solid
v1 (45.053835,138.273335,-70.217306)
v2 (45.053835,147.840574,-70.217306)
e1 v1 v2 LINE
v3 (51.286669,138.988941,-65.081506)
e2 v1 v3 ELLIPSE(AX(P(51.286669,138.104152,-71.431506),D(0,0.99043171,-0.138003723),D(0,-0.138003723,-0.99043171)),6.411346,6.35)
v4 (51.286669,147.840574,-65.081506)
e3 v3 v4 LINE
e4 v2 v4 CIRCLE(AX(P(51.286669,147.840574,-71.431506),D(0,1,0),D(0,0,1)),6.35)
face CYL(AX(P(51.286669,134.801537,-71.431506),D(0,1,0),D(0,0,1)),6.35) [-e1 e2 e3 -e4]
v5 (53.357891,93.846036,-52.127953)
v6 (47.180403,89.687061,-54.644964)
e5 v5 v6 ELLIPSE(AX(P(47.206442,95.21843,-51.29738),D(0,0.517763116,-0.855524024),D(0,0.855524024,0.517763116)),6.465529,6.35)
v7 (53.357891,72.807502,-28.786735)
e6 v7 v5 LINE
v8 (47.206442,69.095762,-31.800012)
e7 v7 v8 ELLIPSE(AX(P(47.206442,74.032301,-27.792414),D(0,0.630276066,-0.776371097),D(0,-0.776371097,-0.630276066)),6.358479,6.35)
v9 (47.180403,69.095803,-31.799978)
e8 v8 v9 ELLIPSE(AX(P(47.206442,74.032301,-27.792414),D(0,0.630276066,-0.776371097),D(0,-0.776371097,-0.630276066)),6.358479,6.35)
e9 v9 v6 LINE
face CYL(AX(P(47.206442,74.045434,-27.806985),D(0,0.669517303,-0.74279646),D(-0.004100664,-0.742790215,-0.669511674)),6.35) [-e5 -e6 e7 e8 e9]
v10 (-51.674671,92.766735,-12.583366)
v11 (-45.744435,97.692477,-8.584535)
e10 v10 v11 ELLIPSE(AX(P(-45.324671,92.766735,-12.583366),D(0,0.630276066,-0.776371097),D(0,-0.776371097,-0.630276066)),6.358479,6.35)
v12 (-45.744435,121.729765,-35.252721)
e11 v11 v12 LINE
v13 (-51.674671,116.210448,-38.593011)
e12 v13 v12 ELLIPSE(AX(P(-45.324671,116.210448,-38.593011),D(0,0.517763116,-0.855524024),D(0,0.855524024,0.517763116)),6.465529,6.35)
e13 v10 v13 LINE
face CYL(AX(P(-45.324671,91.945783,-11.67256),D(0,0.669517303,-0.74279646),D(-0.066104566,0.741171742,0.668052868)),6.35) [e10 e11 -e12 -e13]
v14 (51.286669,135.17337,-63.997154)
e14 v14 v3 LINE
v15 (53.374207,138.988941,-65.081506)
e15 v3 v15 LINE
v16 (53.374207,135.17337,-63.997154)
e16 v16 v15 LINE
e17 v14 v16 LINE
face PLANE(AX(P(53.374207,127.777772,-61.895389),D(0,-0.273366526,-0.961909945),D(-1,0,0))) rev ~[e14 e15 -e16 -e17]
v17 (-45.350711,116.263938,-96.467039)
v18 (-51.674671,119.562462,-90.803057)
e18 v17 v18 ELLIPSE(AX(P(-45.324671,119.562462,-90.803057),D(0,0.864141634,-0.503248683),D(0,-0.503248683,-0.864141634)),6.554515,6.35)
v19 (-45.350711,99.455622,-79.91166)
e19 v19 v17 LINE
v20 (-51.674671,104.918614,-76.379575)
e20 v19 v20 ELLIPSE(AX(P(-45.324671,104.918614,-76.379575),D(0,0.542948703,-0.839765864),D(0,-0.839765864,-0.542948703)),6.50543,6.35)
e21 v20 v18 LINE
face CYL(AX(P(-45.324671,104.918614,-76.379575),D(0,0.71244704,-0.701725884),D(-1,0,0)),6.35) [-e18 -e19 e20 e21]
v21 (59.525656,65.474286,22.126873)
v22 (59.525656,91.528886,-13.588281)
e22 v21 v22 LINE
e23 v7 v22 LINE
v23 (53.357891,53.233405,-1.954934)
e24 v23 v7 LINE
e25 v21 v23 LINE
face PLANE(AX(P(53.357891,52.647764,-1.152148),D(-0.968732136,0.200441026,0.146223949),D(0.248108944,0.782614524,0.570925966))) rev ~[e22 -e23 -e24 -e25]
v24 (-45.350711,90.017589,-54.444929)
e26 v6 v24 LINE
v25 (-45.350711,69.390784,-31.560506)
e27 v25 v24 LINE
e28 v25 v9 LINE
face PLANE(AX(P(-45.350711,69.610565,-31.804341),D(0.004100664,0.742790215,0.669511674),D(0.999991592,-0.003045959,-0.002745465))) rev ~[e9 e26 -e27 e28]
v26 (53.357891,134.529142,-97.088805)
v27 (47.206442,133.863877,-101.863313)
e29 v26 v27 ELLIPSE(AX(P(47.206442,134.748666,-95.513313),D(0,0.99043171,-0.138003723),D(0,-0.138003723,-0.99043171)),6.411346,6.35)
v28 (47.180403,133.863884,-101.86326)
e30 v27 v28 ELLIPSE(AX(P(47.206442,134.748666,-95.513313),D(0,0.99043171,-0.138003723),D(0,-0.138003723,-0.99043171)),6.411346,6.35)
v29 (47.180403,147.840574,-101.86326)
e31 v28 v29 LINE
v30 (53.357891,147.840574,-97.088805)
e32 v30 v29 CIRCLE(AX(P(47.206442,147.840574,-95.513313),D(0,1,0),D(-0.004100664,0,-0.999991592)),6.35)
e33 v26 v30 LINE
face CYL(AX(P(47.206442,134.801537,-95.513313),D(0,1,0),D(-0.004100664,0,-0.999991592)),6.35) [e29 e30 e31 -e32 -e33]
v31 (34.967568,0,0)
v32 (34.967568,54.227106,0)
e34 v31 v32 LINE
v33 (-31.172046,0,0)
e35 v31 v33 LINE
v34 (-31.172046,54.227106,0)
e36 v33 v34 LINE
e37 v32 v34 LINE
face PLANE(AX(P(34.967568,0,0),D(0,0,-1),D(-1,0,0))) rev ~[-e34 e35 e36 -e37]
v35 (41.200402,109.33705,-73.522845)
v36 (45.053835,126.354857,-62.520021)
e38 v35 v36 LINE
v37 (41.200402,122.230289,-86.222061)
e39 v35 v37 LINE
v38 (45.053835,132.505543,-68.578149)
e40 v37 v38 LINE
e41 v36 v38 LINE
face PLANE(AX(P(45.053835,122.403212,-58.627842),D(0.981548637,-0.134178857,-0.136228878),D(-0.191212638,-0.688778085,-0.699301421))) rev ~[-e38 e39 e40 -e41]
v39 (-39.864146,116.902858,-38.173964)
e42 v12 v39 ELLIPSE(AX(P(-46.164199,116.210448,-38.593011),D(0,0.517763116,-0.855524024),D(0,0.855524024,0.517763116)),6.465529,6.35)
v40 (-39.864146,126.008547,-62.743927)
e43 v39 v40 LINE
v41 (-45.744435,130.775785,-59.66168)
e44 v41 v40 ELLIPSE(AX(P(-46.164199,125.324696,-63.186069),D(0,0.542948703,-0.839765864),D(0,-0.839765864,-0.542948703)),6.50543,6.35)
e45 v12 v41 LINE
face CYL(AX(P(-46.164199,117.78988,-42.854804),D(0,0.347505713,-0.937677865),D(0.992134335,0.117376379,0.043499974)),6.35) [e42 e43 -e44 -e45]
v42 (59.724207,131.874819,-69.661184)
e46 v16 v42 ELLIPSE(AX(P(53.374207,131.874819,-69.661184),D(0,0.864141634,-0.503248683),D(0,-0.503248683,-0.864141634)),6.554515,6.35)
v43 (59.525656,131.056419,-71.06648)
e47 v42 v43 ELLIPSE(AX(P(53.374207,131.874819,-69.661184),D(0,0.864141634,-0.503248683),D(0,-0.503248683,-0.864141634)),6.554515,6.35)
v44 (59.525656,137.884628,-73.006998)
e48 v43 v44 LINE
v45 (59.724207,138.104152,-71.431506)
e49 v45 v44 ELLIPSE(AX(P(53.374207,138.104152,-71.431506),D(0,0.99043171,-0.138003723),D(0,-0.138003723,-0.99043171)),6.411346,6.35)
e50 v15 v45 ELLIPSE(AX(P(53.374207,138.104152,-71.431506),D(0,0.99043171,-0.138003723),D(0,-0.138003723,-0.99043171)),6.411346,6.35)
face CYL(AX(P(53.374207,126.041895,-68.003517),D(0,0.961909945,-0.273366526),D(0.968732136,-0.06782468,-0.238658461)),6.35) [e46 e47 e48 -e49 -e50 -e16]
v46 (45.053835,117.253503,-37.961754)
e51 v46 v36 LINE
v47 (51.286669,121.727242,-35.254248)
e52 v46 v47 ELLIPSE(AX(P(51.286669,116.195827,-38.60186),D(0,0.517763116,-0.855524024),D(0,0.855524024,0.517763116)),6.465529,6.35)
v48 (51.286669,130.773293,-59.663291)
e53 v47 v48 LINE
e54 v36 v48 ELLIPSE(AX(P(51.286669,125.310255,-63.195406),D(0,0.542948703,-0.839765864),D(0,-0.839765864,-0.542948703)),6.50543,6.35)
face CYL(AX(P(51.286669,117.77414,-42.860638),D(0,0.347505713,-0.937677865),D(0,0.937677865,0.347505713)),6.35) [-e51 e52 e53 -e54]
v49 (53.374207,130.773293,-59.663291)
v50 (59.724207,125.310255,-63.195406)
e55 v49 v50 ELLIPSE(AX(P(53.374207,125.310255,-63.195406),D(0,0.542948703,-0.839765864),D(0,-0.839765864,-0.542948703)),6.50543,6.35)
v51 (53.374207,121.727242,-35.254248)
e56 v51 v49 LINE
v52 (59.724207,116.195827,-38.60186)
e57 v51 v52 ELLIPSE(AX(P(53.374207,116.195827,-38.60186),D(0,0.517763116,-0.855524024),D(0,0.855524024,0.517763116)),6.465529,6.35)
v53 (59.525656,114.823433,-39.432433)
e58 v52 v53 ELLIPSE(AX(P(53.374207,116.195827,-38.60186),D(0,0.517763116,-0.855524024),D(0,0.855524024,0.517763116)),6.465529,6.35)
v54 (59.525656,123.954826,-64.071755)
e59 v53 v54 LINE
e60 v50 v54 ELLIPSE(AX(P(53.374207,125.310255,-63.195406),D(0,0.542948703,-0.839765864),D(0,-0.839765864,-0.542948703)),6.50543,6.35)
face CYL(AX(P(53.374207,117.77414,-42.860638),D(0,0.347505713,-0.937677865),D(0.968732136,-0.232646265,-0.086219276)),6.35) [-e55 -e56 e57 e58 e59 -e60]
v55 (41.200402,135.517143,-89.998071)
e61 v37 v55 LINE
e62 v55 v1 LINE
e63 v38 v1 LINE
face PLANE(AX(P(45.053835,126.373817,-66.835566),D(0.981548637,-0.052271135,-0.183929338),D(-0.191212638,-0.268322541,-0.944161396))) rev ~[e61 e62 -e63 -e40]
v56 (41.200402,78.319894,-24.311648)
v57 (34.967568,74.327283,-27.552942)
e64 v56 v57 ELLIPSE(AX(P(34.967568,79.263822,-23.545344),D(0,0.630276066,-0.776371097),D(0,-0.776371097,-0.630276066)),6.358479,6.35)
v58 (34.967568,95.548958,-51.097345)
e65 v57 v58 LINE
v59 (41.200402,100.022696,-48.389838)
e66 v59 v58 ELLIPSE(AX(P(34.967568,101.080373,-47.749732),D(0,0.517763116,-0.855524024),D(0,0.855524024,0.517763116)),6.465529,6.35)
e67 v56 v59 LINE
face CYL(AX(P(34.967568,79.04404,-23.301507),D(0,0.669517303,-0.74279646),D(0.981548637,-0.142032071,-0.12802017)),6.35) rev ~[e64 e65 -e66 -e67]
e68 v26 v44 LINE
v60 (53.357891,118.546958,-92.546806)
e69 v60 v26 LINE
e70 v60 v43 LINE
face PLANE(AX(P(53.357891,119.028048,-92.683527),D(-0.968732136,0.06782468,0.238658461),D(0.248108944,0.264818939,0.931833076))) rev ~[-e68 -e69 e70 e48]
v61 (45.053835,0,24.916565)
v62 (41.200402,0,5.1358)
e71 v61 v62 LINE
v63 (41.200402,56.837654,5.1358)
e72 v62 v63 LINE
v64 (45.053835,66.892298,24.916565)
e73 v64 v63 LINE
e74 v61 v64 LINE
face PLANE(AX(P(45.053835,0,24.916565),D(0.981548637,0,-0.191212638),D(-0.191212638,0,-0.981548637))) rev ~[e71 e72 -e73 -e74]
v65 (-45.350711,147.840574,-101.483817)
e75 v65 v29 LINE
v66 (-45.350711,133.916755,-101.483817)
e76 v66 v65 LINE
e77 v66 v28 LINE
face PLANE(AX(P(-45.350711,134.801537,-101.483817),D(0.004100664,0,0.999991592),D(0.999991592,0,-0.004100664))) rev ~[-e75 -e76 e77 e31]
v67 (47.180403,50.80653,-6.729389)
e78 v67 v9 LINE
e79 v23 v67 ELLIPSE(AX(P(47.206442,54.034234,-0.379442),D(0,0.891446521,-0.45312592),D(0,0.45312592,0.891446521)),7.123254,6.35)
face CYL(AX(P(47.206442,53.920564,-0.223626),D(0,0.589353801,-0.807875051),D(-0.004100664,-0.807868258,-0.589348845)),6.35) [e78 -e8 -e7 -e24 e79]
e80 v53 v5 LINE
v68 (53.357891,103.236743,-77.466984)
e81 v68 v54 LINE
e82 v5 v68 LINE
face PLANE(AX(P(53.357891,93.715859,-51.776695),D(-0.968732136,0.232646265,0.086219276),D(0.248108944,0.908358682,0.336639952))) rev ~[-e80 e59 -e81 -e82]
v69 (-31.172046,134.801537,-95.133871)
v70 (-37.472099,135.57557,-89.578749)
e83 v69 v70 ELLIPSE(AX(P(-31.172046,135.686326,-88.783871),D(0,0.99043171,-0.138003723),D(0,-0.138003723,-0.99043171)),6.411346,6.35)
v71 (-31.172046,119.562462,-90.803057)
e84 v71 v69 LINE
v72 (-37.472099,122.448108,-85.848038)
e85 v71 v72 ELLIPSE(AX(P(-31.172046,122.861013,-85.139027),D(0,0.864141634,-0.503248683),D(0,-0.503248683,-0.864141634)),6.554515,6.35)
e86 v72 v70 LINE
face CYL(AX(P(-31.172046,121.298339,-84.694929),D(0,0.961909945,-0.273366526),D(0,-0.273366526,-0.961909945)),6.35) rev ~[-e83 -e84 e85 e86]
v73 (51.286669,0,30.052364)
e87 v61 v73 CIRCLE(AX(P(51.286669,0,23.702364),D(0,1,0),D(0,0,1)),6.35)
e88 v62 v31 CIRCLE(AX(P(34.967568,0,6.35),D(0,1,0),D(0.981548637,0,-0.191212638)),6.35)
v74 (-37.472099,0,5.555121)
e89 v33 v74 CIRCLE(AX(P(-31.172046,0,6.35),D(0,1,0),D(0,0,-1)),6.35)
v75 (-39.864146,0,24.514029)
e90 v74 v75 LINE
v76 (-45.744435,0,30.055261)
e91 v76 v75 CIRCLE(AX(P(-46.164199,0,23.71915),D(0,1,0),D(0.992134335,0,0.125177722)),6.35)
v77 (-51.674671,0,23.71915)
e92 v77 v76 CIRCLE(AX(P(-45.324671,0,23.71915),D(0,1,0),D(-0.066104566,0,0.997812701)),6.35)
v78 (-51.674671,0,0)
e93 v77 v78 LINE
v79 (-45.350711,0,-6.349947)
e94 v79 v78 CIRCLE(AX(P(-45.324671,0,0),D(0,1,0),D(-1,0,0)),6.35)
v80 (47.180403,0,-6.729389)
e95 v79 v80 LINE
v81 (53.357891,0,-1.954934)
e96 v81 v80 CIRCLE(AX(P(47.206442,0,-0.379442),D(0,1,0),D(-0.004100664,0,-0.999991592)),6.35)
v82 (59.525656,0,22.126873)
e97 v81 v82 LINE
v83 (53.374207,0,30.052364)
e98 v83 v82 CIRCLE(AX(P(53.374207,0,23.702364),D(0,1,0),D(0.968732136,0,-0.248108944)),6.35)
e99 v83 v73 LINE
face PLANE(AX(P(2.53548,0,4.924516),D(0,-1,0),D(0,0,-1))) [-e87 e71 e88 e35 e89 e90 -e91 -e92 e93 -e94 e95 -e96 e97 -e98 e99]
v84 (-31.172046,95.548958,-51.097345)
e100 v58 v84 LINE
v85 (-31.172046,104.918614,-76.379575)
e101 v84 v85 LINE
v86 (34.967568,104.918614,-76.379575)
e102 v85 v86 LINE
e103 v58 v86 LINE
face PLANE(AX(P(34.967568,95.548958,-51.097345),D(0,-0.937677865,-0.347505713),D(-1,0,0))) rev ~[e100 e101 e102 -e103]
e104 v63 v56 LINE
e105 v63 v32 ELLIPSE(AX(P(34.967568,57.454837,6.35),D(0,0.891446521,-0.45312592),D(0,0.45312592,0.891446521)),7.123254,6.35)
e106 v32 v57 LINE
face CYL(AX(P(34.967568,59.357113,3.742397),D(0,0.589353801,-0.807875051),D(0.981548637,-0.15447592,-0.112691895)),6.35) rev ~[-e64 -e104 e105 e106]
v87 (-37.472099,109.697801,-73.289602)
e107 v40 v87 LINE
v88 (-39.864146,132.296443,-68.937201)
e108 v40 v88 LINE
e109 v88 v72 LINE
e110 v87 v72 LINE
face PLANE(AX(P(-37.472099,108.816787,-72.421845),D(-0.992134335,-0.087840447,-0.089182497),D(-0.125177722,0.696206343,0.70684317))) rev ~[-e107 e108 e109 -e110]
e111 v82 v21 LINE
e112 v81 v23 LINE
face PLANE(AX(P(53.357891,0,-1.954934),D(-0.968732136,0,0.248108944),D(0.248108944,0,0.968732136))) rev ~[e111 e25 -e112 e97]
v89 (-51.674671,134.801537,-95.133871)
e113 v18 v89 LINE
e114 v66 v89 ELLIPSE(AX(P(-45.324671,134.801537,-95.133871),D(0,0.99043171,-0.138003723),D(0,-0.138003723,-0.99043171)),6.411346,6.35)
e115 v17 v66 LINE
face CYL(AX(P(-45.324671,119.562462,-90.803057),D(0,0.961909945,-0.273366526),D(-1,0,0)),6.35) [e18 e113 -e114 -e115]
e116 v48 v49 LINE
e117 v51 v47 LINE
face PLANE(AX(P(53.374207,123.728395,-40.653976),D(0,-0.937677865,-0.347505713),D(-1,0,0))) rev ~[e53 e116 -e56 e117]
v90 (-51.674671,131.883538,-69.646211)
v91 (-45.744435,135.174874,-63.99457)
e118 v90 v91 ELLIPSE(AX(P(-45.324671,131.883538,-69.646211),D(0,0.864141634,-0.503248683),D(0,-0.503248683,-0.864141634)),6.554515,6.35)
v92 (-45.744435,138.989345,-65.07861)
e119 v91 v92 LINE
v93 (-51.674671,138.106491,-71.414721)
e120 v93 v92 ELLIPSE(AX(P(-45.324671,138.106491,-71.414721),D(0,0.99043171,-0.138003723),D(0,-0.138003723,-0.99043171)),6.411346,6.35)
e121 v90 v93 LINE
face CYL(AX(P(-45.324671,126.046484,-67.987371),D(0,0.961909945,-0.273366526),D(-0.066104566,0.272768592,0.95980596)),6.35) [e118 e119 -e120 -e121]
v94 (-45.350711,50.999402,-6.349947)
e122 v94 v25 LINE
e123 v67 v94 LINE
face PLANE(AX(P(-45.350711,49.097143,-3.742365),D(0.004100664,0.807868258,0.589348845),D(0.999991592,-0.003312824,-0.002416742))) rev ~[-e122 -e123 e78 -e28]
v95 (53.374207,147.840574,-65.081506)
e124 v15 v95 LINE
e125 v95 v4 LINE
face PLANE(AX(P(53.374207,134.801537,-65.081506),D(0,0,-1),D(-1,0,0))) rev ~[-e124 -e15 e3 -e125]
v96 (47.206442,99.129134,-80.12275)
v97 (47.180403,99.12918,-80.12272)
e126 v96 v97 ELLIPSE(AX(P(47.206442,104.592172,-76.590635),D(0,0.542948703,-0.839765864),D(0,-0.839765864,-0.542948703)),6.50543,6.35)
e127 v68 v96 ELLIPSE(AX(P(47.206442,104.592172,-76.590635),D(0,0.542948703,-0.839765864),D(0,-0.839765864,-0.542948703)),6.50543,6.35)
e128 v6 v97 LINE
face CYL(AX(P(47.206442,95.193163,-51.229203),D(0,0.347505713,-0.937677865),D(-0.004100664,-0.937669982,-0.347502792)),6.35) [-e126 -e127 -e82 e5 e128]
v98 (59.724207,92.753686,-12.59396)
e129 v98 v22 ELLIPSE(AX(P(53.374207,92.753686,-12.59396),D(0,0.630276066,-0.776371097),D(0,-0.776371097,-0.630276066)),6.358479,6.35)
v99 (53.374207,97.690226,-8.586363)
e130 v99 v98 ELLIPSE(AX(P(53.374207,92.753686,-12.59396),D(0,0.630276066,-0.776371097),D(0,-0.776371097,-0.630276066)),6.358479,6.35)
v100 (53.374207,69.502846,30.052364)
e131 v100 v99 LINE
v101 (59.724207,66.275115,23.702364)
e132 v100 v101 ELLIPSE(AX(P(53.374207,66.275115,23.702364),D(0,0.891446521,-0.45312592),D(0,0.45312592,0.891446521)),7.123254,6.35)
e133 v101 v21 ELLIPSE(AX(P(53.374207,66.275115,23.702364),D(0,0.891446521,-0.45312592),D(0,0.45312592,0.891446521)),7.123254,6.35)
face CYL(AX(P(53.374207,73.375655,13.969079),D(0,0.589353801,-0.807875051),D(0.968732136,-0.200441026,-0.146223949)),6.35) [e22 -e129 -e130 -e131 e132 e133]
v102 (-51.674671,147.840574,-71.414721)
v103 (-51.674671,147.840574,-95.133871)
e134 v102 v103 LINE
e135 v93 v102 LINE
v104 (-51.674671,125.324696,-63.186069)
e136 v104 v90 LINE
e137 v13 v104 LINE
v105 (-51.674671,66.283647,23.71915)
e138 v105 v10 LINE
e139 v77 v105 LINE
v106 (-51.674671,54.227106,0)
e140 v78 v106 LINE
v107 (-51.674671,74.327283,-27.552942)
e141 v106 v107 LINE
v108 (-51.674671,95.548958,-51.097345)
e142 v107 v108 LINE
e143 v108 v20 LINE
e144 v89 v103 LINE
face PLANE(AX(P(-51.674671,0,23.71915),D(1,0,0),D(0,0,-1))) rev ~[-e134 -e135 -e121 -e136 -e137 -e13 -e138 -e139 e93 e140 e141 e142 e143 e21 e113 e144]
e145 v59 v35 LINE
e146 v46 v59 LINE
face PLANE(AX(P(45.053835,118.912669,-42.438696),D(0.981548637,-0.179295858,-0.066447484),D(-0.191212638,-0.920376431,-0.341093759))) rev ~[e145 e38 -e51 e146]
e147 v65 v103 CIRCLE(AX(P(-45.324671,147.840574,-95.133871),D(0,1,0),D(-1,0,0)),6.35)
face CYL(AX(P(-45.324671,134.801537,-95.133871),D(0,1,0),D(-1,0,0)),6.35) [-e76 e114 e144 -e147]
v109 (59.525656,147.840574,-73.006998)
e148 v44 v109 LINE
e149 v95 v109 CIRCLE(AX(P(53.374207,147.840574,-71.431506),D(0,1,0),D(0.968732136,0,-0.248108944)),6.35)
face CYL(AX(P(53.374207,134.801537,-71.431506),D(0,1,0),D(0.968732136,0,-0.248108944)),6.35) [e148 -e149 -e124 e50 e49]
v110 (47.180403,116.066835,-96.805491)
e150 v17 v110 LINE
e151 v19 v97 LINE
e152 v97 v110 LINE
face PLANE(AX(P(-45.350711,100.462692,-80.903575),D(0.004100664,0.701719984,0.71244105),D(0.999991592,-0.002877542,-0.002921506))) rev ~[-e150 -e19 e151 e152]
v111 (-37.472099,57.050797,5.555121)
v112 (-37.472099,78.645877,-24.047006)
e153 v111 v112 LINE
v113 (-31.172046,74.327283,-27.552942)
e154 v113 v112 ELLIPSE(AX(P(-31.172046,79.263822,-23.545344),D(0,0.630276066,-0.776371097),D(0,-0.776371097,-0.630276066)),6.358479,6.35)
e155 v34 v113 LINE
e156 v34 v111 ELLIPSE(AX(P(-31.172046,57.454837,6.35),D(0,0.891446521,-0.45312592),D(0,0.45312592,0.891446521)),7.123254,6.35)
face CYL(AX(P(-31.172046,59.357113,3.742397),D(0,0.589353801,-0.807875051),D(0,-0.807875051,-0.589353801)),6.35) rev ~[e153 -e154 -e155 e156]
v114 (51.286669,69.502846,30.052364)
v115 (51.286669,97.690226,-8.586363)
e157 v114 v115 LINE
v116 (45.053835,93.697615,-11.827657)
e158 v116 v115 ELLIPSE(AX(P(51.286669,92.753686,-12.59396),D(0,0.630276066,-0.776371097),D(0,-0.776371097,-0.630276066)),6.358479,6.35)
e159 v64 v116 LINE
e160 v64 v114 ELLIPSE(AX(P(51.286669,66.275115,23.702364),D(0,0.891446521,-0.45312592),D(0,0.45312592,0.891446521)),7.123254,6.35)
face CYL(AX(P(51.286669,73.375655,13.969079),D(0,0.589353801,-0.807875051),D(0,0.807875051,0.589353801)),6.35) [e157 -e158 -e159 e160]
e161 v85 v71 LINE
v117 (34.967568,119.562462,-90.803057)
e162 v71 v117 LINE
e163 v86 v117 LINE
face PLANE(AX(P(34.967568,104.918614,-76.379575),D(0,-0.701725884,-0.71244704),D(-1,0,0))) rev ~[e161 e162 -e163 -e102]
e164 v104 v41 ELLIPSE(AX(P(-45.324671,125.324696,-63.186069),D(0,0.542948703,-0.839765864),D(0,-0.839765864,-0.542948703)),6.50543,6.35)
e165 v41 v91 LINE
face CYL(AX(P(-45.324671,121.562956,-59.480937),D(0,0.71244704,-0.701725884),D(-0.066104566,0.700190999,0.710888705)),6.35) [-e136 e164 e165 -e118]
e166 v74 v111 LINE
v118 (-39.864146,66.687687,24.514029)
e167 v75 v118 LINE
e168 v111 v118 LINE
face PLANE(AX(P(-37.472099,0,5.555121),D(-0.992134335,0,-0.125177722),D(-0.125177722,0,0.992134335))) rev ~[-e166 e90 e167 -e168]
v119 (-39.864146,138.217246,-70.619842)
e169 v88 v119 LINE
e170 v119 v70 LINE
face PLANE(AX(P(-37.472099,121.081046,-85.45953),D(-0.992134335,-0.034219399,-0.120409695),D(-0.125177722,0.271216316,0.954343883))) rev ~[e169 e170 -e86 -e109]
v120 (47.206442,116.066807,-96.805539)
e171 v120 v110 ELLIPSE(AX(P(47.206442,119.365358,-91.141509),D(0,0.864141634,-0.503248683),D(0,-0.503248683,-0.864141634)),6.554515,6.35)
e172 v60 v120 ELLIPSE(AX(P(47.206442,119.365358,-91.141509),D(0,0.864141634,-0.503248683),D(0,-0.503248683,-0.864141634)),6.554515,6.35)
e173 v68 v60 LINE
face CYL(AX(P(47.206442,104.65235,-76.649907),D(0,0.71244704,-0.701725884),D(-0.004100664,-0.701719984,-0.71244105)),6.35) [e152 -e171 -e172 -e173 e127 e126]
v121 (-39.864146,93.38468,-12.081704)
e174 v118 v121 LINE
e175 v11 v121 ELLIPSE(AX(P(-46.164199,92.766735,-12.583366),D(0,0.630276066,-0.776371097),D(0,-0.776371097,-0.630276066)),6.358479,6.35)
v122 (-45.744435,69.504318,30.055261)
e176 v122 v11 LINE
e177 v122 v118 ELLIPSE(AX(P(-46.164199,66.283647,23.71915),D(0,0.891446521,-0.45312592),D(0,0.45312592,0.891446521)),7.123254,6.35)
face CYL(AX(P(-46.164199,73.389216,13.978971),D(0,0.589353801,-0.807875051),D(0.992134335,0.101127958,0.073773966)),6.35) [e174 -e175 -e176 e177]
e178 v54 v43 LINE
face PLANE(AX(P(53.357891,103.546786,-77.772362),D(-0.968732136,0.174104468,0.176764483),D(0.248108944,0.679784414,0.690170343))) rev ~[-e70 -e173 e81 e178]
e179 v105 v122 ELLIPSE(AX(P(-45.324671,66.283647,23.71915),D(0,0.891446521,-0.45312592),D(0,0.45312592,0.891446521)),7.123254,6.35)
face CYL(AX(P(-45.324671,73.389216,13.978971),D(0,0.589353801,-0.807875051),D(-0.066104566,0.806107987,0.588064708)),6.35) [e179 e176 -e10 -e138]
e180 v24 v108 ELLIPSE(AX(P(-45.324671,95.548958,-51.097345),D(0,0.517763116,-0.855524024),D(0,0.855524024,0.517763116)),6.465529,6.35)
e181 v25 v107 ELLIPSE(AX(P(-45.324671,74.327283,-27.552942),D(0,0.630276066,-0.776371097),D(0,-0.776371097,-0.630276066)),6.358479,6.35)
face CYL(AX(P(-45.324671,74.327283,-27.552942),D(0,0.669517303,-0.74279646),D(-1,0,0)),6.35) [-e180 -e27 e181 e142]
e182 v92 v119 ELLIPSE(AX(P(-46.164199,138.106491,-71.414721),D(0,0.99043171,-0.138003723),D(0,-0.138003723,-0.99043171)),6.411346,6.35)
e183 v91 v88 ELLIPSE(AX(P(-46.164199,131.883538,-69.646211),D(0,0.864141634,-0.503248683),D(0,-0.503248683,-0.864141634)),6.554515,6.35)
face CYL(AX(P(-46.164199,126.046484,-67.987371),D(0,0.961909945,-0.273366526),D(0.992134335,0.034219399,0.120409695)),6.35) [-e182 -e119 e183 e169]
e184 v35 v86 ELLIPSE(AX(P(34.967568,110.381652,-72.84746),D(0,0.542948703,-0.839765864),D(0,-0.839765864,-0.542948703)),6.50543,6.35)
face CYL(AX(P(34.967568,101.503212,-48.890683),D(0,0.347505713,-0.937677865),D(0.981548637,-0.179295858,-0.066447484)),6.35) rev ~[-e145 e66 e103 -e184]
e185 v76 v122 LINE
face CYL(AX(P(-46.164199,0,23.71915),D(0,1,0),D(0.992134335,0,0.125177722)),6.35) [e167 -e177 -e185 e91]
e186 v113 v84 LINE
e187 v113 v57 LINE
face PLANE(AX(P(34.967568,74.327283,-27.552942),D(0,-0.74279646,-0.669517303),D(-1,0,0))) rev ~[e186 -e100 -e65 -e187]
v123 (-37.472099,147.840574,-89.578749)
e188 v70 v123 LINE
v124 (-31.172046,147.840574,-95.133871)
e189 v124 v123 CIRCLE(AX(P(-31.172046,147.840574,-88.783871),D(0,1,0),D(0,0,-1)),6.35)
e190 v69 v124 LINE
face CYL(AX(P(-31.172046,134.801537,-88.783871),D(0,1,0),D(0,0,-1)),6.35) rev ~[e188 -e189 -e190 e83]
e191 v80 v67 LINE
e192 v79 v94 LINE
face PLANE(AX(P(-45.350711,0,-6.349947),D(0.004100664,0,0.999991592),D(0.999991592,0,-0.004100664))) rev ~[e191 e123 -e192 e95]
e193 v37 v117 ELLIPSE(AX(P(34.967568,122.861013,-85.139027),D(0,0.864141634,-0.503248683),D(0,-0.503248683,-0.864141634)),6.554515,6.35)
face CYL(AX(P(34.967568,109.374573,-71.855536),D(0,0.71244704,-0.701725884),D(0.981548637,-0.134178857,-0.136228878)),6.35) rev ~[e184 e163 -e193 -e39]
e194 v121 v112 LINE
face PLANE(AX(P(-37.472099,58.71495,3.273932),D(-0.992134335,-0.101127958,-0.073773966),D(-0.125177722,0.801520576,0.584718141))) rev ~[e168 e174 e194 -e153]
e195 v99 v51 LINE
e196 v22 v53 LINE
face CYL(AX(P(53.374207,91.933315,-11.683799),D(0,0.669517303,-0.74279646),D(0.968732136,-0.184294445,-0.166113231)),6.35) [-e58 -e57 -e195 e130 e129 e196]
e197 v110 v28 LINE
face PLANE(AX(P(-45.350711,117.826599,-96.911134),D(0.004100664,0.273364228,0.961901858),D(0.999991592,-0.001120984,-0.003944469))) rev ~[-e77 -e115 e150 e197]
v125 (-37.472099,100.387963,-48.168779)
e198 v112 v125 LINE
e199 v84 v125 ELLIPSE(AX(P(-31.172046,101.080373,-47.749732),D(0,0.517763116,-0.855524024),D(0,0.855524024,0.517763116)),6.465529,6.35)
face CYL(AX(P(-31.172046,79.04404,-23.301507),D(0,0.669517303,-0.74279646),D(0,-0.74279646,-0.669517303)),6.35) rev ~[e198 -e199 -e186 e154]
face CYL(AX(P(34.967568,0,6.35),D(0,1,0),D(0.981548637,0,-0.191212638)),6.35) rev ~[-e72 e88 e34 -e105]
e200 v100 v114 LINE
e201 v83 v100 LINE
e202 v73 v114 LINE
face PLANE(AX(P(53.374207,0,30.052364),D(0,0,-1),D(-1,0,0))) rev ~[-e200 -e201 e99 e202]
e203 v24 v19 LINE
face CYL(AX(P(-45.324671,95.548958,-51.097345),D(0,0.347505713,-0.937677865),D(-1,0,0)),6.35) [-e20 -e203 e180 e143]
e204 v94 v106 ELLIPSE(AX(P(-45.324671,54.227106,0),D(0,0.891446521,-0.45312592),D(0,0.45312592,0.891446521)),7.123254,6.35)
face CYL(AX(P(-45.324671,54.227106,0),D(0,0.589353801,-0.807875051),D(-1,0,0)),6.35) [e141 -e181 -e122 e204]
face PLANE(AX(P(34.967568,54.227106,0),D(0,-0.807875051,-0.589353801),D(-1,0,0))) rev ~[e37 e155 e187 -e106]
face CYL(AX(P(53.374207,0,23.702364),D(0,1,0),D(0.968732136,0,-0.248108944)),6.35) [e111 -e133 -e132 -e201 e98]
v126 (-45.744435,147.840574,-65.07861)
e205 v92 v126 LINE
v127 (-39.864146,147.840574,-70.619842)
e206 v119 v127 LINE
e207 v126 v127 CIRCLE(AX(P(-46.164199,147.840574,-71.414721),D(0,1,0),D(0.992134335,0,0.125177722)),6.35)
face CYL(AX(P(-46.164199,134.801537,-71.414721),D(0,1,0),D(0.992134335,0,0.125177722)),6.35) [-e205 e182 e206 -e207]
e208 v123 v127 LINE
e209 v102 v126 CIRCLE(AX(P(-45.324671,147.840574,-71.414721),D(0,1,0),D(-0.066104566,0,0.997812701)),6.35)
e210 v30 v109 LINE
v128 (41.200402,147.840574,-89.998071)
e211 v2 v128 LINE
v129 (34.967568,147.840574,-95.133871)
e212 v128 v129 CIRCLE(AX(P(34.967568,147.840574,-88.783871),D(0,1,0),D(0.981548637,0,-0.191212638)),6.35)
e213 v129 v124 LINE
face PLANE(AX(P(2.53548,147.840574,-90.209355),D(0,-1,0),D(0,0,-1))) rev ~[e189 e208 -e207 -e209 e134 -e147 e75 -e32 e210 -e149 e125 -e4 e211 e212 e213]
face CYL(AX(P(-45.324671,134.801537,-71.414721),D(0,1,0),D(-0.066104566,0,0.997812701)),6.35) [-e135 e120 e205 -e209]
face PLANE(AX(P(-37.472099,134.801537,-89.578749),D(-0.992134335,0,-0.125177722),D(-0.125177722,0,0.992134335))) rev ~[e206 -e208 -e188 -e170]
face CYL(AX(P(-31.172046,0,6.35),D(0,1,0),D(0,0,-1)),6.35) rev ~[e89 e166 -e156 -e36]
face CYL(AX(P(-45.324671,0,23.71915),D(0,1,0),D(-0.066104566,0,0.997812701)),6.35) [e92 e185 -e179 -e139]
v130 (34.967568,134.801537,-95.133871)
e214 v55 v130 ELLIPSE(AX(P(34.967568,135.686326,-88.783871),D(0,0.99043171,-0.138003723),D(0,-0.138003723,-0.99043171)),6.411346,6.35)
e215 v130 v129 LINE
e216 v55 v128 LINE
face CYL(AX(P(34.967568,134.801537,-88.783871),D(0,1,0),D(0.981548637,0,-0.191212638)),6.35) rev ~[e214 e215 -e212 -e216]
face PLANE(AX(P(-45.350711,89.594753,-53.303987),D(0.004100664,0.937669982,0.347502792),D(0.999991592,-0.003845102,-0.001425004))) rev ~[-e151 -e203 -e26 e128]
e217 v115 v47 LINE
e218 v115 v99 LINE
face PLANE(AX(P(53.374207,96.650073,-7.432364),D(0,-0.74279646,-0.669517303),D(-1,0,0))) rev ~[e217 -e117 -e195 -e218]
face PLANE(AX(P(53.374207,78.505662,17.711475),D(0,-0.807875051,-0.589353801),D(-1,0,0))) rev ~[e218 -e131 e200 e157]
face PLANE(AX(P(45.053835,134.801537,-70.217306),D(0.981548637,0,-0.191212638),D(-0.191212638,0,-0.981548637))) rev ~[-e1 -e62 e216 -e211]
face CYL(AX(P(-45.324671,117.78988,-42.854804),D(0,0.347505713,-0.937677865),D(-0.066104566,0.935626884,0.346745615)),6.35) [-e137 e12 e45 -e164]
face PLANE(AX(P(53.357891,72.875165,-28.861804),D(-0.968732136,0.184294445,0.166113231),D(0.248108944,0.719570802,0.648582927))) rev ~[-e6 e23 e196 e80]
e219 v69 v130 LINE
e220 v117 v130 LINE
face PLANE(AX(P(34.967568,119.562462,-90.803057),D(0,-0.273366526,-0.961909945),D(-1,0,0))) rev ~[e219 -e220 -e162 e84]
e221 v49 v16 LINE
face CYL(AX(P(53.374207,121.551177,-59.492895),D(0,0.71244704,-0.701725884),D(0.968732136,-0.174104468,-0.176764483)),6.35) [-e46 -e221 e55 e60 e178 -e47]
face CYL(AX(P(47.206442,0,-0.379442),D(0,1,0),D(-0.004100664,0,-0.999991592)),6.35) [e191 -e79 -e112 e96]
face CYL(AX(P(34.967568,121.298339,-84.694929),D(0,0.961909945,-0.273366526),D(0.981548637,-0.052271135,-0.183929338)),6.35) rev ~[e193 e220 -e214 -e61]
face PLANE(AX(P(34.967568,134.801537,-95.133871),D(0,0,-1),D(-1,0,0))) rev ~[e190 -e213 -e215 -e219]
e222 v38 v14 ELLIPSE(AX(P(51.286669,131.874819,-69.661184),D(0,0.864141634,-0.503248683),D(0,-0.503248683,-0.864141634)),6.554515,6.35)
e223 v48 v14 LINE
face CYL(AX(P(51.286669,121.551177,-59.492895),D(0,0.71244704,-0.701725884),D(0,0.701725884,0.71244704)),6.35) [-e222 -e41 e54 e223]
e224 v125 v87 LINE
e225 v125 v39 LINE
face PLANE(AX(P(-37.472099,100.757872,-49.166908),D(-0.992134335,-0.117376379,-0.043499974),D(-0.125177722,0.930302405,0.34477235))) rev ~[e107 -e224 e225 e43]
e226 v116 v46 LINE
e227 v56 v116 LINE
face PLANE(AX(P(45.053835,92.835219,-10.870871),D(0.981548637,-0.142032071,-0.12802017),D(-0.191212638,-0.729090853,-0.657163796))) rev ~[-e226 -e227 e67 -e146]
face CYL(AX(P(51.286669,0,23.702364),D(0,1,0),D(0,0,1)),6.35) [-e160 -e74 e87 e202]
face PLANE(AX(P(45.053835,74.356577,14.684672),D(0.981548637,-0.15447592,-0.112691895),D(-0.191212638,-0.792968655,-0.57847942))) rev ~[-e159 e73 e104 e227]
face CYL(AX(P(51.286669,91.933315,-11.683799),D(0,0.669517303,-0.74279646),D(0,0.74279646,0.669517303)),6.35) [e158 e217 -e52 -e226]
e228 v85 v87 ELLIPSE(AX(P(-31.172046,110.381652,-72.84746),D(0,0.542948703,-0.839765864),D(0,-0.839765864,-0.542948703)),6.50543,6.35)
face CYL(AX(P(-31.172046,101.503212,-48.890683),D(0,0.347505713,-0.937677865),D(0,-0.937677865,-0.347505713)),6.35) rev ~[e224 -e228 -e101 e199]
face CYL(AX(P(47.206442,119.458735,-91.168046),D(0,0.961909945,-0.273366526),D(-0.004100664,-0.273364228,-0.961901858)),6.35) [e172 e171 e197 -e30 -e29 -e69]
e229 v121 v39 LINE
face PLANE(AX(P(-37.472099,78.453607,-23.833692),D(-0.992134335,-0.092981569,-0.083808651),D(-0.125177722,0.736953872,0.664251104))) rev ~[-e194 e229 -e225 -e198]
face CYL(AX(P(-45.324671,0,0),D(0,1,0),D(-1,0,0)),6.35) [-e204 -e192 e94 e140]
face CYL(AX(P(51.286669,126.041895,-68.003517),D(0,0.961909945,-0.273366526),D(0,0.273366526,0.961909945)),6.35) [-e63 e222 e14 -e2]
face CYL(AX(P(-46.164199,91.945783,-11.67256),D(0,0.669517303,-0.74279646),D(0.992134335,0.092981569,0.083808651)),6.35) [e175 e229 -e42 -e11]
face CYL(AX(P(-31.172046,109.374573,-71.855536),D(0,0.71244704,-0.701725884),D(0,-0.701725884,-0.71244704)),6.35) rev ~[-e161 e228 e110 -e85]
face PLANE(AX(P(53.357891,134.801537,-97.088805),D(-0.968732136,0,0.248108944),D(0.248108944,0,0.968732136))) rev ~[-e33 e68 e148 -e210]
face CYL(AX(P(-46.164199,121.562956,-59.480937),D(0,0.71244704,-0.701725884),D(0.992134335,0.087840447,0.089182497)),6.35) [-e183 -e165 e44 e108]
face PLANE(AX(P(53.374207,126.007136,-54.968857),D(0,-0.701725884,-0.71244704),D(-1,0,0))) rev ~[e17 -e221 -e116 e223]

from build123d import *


with BuildPart() as f2:
    # F2: sweep along a path in F1
    with BuildLine(Plane.YZ) as f2_path:
        Line((0, 0), (54.2271062732, 0))
        Line((54.2271062732, 0), (74.3272826076, -27.5529418141))
        Line((74.3272826076, -27.5529418141), (95.5489575863, -51.0973446071))
        Line((95.5489575863, -51.0973446071), (104.9186140299, -76.3795748353))
        Line((104.9186140299, -76.3795748353), (119.5624619722, -90.8030569553))
        Line((119.5624619722, -90.8030569553), (134.8015367985, -95.1338708401))
        Line((134.8015367985, -95.1338708401), (147.8405743837, -95.1338708401))
    # F0 (on Front) → F2 (sweep)
    with BuildSketch(Plane.XZ):
        with BuildLine():
            Line((-51.6746714711, 23.7191500306), (-51.6746714711, 0))
            ThreePointArc((-51.6746714711, 0), (-49.8239963657, -4.4809123505), (-45.350710686, -6.3499466107))
            Line((-45.350710686, -6.3499466107), (47.1804031889, -6.7293887862))
            ThreePointArc((47.1804031889, -6.7293887862), (51.089613293, -5.4037315626), (53.357891469, -1.9549339708))
            Line((53.357891469, -1.9549339708), (59.5256559013, 22.1268726525))
            ThreePointArc((59.5256559013, 22.1268726525), (58.3905238566, 27.5958286572), (53.374206836, 30.0523644478))
            Line((53.374206836, 30.0523644478), (51.2866688171, 30.0523644478))
            ThreePointArc((51.2866688171, 30.0523644478), (47.2485796403, 28.6030109154), (45.0538349714, 24.9165646999))
            Line((45.0538349714, 24.9165646999), (41.2004016239, 5.1357997479))
            ThreePointArc((41.2004016239, 5.1357997479), (39.005656955, 1.4493535324), (34.9675677782, 0))
            Line((34.9675677782, 0), (-31.172045563, 0))
            ThreePointArc((-31.172045563, 0), (-35.3717492022, 1.587123837), (-37.472098588, 5.5551214666))
            Line((-37.472098588, 5.5551214666), (-39.8641464341, 24.514028564))
            ThreePointArc((-39.8641464341, 24.514028564), (-41.8092828653, 28.3405352625), (-45.7444354651, 30.0552606822))
            ThreePointArc((-45.7444354651, 30.0552606822), (-49.9608337505, 28.0583319027), (-51.6746714711, 23.7191500306))
        make_face()
    sweep(path=f2_path.line, transition=Transition.RIGHT)


solid = f2.part
